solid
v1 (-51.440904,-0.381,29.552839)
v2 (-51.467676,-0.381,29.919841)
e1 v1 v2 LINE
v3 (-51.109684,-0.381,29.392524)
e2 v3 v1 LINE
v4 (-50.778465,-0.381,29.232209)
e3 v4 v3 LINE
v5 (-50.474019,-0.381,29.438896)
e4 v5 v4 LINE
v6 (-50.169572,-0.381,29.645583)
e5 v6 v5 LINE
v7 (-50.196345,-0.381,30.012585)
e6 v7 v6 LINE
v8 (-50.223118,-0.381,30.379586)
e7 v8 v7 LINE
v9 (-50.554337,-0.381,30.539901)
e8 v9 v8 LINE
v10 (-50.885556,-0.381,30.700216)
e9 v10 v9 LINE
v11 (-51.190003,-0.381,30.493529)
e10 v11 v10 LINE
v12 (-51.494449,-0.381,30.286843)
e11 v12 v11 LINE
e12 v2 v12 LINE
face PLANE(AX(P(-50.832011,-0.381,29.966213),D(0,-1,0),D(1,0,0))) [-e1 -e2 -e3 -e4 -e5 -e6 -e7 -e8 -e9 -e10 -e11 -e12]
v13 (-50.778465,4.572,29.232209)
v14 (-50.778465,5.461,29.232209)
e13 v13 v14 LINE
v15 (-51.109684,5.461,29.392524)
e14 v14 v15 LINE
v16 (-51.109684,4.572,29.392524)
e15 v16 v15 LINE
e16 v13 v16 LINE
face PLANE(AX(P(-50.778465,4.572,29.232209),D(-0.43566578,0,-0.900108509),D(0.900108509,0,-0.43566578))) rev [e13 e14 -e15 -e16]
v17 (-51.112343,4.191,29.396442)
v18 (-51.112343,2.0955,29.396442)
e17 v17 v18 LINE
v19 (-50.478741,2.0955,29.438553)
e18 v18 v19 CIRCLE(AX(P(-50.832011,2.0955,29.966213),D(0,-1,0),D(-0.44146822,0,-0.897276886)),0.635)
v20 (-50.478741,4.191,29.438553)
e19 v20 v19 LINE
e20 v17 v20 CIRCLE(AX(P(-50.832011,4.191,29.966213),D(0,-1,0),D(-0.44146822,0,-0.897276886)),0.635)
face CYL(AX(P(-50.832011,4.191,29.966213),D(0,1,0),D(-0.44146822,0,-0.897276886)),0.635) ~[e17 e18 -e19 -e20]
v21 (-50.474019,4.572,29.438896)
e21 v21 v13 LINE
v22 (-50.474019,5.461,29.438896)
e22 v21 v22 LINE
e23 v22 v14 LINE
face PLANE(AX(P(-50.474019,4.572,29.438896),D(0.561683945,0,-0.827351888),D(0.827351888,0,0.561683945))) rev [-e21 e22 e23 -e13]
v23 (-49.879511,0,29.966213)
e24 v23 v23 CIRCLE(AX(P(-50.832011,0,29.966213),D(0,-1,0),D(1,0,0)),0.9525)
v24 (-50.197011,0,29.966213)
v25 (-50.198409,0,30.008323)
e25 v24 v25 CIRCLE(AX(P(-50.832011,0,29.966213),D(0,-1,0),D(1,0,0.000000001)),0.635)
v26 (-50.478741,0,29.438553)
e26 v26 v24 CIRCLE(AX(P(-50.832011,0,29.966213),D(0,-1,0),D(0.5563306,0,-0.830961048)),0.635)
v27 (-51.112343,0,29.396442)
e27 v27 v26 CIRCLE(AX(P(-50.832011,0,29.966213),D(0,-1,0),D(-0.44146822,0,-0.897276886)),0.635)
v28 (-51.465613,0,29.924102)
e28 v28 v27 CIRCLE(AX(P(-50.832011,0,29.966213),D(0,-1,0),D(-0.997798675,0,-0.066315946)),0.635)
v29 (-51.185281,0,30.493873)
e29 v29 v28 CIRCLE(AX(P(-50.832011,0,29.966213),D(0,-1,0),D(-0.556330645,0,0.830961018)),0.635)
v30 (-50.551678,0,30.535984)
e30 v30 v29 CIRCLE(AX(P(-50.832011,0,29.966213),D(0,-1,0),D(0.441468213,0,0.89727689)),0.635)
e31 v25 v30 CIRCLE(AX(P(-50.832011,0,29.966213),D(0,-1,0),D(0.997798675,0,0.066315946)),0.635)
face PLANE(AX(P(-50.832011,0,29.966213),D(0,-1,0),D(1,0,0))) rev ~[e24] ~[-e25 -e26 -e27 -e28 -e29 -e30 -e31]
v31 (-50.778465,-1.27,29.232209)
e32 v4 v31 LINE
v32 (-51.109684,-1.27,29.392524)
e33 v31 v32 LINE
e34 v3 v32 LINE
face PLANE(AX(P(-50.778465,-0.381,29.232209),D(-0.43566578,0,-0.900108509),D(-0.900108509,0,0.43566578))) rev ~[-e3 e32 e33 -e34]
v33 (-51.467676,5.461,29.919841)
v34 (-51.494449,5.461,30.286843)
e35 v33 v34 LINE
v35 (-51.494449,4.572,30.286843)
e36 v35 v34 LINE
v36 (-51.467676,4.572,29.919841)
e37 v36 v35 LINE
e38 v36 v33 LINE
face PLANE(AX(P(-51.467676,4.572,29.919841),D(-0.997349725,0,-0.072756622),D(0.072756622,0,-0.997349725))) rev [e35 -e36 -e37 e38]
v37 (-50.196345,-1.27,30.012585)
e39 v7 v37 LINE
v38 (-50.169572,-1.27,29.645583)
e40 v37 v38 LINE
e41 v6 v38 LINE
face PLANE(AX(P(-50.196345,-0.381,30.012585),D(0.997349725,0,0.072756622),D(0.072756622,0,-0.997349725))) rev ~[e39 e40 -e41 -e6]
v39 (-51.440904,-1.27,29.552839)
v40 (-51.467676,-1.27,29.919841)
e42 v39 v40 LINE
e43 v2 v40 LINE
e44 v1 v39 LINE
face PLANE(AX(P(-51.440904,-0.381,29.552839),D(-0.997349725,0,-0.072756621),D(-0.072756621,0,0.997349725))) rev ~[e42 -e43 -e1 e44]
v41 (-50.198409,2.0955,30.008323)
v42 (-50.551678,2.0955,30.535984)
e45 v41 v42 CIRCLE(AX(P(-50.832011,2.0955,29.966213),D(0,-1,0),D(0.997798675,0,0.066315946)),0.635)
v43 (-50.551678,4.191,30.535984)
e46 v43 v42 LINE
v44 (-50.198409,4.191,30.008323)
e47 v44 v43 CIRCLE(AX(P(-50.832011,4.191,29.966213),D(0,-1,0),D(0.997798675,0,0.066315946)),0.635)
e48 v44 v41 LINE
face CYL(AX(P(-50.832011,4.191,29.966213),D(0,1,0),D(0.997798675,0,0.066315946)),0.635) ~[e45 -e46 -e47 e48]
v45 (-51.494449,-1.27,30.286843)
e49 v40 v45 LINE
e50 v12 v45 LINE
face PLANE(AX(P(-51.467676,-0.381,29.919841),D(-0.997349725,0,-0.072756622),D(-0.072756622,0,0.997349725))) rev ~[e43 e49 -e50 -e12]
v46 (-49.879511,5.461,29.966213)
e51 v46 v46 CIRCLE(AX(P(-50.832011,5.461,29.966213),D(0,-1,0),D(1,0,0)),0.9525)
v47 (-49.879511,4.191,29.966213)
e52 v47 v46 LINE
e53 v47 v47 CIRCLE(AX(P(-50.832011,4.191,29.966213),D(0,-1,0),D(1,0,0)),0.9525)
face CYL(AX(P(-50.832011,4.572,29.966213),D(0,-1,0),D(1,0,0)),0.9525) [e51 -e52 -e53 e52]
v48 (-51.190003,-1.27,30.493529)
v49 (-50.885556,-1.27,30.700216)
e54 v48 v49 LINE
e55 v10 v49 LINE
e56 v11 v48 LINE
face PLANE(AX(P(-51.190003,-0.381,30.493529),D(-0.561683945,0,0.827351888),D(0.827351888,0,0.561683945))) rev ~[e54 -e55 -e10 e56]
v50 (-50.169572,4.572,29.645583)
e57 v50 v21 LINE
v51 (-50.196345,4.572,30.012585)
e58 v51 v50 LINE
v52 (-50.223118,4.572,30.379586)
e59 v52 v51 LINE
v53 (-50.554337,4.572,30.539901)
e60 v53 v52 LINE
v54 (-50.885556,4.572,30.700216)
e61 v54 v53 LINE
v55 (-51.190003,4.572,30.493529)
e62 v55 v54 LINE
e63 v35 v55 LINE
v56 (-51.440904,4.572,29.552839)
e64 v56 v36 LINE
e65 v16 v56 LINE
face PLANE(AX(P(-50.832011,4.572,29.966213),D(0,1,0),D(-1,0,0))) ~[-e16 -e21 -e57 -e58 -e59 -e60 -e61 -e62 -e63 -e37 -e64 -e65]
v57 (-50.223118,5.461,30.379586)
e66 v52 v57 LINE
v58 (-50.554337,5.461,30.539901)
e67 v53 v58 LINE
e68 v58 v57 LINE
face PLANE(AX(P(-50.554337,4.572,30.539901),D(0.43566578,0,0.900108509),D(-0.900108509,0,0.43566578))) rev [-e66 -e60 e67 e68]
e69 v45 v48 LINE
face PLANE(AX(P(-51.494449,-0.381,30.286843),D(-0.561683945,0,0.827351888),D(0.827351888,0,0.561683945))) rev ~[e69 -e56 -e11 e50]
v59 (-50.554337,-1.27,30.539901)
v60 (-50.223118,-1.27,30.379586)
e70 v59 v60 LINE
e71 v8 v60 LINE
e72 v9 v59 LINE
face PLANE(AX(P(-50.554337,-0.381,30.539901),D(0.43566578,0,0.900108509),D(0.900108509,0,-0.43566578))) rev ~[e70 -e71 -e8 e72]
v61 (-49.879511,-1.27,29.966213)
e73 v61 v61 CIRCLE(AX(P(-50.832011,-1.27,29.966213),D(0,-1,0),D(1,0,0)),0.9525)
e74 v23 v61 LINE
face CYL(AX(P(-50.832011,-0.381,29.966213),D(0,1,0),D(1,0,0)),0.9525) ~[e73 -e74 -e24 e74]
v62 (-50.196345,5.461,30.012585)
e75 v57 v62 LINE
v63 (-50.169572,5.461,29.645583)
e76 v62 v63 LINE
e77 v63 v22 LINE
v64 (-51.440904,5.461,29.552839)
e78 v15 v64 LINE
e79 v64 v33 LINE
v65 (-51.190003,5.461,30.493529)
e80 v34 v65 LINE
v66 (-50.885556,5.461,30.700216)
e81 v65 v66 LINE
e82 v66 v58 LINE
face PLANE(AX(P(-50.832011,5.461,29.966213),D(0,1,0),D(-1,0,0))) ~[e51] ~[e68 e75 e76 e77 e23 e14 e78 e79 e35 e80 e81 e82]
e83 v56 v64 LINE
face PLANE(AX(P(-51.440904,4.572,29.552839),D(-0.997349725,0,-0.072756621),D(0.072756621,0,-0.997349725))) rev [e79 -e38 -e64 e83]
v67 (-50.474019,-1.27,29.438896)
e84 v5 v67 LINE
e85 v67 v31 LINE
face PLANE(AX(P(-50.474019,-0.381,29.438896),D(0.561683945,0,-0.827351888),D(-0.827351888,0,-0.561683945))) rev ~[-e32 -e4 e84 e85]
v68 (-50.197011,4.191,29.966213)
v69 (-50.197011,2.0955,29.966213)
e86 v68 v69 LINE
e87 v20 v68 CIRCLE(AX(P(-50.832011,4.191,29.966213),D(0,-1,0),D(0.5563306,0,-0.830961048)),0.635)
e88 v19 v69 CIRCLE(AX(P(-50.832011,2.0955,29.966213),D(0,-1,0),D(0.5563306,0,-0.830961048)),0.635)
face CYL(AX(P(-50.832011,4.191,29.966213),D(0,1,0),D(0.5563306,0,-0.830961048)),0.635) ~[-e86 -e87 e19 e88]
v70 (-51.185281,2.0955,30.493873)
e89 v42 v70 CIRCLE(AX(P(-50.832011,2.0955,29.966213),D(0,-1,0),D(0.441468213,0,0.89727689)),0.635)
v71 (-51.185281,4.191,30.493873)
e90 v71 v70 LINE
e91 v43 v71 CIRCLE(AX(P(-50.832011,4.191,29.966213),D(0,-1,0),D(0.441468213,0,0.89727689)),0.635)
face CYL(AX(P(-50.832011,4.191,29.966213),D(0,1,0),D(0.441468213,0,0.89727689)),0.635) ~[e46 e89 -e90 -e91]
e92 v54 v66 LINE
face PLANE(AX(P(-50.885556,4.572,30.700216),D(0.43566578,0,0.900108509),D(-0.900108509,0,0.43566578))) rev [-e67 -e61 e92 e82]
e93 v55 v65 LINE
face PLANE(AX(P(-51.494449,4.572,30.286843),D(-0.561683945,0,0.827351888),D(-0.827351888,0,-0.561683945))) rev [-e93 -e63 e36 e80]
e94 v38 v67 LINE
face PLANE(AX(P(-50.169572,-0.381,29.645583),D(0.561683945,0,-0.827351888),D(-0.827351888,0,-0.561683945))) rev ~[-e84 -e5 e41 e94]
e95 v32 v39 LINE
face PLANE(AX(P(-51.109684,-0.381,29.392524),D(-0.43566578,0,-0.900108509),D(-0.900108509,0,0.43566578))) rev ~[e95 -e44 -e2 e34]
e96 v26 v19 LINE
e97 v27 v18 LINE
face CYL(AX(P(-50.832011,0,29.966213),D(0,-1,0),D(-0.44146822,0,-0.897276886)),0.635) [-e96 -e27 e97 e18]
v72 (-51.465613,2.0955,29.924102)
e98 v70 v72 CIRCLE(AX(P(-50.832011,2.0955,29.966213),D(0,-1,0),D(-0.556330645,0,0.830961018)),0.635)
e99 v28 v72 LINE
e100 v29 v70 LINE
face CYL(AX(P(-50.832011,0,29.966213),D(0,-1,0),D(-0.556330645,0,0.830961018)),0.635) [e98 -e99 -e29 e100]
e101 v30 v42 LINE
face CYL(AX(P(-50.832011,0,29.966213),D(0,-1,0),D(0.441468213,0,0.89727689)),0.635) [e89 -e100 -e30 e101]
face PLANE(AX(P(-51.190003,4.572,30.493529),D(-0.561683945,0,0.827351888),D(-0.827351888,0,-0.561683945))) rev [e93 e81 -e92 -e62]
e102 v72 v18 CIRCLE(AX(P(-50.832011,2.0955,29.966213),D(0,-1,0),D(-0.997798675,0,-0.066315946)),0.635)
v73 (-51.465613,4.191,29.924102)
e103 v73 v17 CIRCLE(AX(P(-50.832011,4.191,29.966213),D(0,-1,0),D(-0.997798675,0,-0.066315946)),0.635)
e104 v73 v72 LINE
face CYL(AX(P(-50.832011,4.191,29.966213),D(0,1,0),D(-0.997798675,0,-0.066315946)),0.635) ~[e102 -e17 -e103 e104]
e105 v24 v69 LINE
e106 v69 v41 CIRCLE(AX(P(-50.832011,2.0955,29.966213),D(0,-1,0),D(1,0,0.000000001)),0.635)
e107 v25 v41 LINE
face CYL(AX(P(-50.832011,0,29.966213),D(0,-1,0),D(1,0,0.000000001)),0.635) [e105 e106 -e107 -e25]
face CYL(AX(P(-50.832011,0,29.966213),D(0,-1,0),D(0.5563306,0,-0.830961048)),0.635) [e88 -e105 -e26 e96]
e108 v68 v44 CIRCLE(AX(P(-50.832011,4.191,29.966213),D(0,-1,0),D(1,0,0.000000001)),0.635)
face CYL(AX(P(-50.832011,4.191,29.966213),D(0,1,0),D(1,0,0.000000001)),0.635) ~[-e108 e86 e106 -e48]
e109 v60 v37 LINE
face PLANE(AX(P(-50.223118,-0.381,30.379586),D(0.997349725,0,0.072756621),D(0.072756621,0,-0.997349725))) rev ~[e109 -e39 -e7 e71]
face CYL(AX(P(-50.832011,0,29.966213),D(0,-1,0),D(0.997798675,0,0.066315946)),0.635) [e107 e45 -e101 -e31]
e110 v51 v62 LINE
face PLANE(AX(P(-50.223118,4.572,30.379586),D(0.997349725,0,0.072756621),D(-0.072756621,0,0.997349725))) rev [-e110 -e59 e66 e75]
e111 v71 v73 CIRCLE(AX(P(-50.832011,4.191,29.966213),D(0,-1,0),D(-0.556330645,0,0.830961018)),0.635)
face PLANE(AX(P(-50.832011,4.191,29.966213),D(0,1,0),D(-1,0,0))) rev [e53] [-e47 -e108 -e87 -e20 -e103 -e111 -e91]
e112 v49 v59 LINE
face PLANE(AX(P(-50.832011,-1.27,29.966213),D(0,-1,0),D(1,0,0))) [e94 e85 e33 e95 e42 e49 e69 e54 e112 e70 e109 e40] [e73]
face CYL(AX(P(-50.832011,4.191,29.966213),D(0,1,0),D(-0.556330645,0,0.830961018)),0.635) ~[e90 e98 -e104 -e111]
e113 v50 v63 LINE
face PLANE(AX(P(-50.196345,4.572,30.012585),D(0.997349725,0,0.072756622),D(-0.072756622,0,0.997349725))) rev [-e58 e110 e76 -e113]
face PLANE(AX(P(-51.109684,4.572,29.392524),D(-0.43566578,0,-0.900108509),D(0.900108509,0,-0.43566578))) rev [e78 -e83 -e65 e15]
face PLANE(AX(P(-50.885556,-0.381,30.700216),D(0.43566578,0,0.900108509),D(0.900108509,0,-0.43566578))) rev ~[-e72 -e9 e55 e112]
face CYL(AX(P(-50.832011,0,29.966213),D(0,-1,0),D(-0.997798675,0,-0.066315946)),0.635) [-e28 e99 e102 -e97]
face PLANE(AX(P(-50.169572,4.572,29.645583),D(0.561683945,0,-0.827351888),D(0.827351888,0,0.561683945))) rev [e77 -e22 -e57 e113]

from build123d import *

# Parameters (mm, degrees)
F1_DEPTH = 2.0955
F0_R     = 0.9525
F2_DEPTH = 0.381
F3_R     = 0.9525
F4_DEPTH = 0.889


with BuildPart() as f1:
    # F0 (on Front) → F1 (new body)
    with BuildSketch(Plane.XZ):
        with BuildLine():
            ThreePointArc((-50.4787408751, 29.4385525432), (-50.27185395, 29.6671320557), (-50.1970108056, 29.9662128091))
            ThreePointArc((-50.1970108056, 29.9662128091), (-50.1973603622, 29.9872797188), (-50.1984086471, 30.0083234346))
            ThreePointArc((-50.1984086471, 30.0083234346), (-50.3043505199, 30.31948271), (-50.5516784903, 30.5359836341))
            ThreePointArc((-50.5516784903, 30.5359836341), (-50.8741213768, 30.5998149712), (-51.1852807654, 30.4938730554))
            ThreePointArc((-51.1852807654, 30.4938730554), (-51.4017816859, 30.246545012), (-51.4656129641, 29.9241021836))
            ThreePointArc((-51.4656129641, 29.9241021836), (-51.3596710927, 29.6129429103), (-51.1123431255, 29.3964419864))
            ThreePointArc((-51.1123431255, 29.3964419864), (-50.7899002546, 29.3326106457), (-50.4787408751, 29.4385525432))
        make_face()
    extrude(amount=-F1_DEPTH)

    # F0 (on Front) → F2 (join)
    with BuildSketch(Plane.XZ):
        with Locations((-50.8320108056, 29.9662128091)):
            Circle(F0_R)
        Polygon((-50.2227212209, 30.3741338006), (-50.1984086471, 30.0083234346), (-50.1740960719, 29.6425130463), (-50.4787408751, 29.4385525432), (-50.7833856565, 29.2345920547), (-51.1123431255, 29.3964419864), (-51.4413003903, 29.5582918175), (-51.4656129641, 29.9241021836), (-51.4899255394, 30.2899125719), (-51.1852807654, 30.4938730554), (-50.8806359547, 30.6978335634), (-50.5516784903, 30.5359836341), align=None, mode=Mode.SUBTRACT)
        with BuildLine():
            ThreePointArc((-50.4787408751, 29.4385525432), (-50.27185395, 29.6671320557), (-50.1970108056, 29.9662128091))
            ThreePointArc((-50.1970108056, 29.9662128091), (-50.1973603622, 29.9872797188), (-50.1984086471, 30.0083234346))
            ThreePointArc((-50.1984086471, 30.0083234346), (-50.3043505199, 30.31948271), (-50.5516784903, 30.5359836341))
            ThreePointArc((-50.5516784903, 30.5359836341), (-50.8741213768, 30.5998149712), (-51.1852807654, 30.4938730554))
            ThreePointArc((-51.1852807654, 30.4938730554), (-51.4017816859, 30.246545012), (-51.4656129641, 29.9241021836))
            ThreePointArc((-51.4656129641, 29.9241021836), (-51.3596710927, 29.6129429103), (-51.1123431255, 29.3964419864))
            ThreePointArc((-51.1123431255, 29.3964419864), (-50.7899002546, 29.3326106457), (-50.4787408751, 29.4385525432))
        make_face()
        with BuildLine():
            ThreePointArc((-50.1984086471, 30.0083234346), (-50.1973603622, 29.9872797188), (-50.1970108056, 29.9662128091))
            ThreePointArc((-50.1970108056, 29.9662128091), (-50.27185395, 29.6671320557), (-50.4787408751, 29.4385525432))
            Line((-50.4787408751, 29.4385525432), (-50.1740960719, 29.6425130463))
            Line((-50.1740960719, 29.6425130463), (-50.1984086471, 30.0083234346))
        make_face()
        with BuildLine():
            ThreePointArc((-50.5516784903, 30.5359836341), (-50.3043505199, 30.31948271), (-50.1984086471, 30.0083234346))
            Line((-50.1984086471, 30.0083234346), (-50.2227212209, 30.3741338006))
            Line((-50.2227212209, 30.3741338006), (-50.5516784903, 30.5359836341))
        make_face()
        with BuildLine():
            Line((-50.7833856565, 29.2345920547), (-50.4787408751, 29.4385525432))
            ThreePointArc((-50.4787408751, 29.4385525432), (-50.7899002546, 29.3326106457), (-51.1123431255, 29.3964419864))
            Line((-51.1123431255, 29.3964419864), (-50.7833856565, 29.2345920547))
        make_face()
        with BuildLine():
            ThreePointArc((-51.1852807654, 30.4938730554), (-50.8741213768, 30.5998149712), (-50.5516784903, 30.5359836341))
            Line((-50.5516784903, 30.5359836341), (-50.8806359547, 30.6978335634))
            Line((-50.8806359547, 30.6978335634), (-51.1852807654, 30.4938730554))
        make_face()
        with BuildLine():
            Line((-51.4413003903, 29.5582918175), (-51.1123431255, 29.3964419864))
            ThreePointArc((-51.1123431255, 29.3964419864), (-51.3596710927, 29.6129429103), (-51.4656129641, 29.9241021836))
            Line((-51.4656129641, 29.9241021836), (-51.4413003903, 29.5582918175))
        make_face()
        with BuildLine():
            ThreePointArc((-51.4656129641, 29.9241021836), (-51.4017816859, 30.246545012), (-51.1852807654, 30.4938730554))
            Line((-51.1852807654, 30.4938730554), (-51.4899255394, 30.2899125719))
            Line((-51.4899255394, 30.2899125719), (-51.4656129641, 29.9241021836))
        make_face()
    extrude(amount=F2_DEPTH)

    # F3 (on face) → F4 (join)
    with BuildSketch(Plane.XZ.offset(0.381)):
        with Locations((-50.8320108056, 29.9662128091)):
            Circle(F3_R)
        Polygon((-50.2231179997, 30.3795862702), (-50.1963452388, 30.012584543), (-50.1695724841, 29.6455829016), (-50.4740186105, 29.4388963588), (-50.77846529, 29.2322094405), (-51.1096844946, 29.3925244155), (-51.4409036115, 29.552839348), (-51.4676763724, 29.9198410751), (-51.4944491271, 30.2868427166), (-51.1900030005, 30.4935292595), (-50.8855563212, 30.7002161777), (-50.5543371681, 30.5399012276), align=None, mode=Mode.SUBTRACT)
    extrude(amount=F4_DEPTH)

    # F5: F1 across face


with BuildPart() as f1_1:
    add(f1.part)
    add(f1.part.mirror(Plane(origin=(-50.8320108056, 2.0955, 29.9662128091), x_dir=(1, 0, 0), z_dir=(0, 1, 0))))


solid = f1_1.part
